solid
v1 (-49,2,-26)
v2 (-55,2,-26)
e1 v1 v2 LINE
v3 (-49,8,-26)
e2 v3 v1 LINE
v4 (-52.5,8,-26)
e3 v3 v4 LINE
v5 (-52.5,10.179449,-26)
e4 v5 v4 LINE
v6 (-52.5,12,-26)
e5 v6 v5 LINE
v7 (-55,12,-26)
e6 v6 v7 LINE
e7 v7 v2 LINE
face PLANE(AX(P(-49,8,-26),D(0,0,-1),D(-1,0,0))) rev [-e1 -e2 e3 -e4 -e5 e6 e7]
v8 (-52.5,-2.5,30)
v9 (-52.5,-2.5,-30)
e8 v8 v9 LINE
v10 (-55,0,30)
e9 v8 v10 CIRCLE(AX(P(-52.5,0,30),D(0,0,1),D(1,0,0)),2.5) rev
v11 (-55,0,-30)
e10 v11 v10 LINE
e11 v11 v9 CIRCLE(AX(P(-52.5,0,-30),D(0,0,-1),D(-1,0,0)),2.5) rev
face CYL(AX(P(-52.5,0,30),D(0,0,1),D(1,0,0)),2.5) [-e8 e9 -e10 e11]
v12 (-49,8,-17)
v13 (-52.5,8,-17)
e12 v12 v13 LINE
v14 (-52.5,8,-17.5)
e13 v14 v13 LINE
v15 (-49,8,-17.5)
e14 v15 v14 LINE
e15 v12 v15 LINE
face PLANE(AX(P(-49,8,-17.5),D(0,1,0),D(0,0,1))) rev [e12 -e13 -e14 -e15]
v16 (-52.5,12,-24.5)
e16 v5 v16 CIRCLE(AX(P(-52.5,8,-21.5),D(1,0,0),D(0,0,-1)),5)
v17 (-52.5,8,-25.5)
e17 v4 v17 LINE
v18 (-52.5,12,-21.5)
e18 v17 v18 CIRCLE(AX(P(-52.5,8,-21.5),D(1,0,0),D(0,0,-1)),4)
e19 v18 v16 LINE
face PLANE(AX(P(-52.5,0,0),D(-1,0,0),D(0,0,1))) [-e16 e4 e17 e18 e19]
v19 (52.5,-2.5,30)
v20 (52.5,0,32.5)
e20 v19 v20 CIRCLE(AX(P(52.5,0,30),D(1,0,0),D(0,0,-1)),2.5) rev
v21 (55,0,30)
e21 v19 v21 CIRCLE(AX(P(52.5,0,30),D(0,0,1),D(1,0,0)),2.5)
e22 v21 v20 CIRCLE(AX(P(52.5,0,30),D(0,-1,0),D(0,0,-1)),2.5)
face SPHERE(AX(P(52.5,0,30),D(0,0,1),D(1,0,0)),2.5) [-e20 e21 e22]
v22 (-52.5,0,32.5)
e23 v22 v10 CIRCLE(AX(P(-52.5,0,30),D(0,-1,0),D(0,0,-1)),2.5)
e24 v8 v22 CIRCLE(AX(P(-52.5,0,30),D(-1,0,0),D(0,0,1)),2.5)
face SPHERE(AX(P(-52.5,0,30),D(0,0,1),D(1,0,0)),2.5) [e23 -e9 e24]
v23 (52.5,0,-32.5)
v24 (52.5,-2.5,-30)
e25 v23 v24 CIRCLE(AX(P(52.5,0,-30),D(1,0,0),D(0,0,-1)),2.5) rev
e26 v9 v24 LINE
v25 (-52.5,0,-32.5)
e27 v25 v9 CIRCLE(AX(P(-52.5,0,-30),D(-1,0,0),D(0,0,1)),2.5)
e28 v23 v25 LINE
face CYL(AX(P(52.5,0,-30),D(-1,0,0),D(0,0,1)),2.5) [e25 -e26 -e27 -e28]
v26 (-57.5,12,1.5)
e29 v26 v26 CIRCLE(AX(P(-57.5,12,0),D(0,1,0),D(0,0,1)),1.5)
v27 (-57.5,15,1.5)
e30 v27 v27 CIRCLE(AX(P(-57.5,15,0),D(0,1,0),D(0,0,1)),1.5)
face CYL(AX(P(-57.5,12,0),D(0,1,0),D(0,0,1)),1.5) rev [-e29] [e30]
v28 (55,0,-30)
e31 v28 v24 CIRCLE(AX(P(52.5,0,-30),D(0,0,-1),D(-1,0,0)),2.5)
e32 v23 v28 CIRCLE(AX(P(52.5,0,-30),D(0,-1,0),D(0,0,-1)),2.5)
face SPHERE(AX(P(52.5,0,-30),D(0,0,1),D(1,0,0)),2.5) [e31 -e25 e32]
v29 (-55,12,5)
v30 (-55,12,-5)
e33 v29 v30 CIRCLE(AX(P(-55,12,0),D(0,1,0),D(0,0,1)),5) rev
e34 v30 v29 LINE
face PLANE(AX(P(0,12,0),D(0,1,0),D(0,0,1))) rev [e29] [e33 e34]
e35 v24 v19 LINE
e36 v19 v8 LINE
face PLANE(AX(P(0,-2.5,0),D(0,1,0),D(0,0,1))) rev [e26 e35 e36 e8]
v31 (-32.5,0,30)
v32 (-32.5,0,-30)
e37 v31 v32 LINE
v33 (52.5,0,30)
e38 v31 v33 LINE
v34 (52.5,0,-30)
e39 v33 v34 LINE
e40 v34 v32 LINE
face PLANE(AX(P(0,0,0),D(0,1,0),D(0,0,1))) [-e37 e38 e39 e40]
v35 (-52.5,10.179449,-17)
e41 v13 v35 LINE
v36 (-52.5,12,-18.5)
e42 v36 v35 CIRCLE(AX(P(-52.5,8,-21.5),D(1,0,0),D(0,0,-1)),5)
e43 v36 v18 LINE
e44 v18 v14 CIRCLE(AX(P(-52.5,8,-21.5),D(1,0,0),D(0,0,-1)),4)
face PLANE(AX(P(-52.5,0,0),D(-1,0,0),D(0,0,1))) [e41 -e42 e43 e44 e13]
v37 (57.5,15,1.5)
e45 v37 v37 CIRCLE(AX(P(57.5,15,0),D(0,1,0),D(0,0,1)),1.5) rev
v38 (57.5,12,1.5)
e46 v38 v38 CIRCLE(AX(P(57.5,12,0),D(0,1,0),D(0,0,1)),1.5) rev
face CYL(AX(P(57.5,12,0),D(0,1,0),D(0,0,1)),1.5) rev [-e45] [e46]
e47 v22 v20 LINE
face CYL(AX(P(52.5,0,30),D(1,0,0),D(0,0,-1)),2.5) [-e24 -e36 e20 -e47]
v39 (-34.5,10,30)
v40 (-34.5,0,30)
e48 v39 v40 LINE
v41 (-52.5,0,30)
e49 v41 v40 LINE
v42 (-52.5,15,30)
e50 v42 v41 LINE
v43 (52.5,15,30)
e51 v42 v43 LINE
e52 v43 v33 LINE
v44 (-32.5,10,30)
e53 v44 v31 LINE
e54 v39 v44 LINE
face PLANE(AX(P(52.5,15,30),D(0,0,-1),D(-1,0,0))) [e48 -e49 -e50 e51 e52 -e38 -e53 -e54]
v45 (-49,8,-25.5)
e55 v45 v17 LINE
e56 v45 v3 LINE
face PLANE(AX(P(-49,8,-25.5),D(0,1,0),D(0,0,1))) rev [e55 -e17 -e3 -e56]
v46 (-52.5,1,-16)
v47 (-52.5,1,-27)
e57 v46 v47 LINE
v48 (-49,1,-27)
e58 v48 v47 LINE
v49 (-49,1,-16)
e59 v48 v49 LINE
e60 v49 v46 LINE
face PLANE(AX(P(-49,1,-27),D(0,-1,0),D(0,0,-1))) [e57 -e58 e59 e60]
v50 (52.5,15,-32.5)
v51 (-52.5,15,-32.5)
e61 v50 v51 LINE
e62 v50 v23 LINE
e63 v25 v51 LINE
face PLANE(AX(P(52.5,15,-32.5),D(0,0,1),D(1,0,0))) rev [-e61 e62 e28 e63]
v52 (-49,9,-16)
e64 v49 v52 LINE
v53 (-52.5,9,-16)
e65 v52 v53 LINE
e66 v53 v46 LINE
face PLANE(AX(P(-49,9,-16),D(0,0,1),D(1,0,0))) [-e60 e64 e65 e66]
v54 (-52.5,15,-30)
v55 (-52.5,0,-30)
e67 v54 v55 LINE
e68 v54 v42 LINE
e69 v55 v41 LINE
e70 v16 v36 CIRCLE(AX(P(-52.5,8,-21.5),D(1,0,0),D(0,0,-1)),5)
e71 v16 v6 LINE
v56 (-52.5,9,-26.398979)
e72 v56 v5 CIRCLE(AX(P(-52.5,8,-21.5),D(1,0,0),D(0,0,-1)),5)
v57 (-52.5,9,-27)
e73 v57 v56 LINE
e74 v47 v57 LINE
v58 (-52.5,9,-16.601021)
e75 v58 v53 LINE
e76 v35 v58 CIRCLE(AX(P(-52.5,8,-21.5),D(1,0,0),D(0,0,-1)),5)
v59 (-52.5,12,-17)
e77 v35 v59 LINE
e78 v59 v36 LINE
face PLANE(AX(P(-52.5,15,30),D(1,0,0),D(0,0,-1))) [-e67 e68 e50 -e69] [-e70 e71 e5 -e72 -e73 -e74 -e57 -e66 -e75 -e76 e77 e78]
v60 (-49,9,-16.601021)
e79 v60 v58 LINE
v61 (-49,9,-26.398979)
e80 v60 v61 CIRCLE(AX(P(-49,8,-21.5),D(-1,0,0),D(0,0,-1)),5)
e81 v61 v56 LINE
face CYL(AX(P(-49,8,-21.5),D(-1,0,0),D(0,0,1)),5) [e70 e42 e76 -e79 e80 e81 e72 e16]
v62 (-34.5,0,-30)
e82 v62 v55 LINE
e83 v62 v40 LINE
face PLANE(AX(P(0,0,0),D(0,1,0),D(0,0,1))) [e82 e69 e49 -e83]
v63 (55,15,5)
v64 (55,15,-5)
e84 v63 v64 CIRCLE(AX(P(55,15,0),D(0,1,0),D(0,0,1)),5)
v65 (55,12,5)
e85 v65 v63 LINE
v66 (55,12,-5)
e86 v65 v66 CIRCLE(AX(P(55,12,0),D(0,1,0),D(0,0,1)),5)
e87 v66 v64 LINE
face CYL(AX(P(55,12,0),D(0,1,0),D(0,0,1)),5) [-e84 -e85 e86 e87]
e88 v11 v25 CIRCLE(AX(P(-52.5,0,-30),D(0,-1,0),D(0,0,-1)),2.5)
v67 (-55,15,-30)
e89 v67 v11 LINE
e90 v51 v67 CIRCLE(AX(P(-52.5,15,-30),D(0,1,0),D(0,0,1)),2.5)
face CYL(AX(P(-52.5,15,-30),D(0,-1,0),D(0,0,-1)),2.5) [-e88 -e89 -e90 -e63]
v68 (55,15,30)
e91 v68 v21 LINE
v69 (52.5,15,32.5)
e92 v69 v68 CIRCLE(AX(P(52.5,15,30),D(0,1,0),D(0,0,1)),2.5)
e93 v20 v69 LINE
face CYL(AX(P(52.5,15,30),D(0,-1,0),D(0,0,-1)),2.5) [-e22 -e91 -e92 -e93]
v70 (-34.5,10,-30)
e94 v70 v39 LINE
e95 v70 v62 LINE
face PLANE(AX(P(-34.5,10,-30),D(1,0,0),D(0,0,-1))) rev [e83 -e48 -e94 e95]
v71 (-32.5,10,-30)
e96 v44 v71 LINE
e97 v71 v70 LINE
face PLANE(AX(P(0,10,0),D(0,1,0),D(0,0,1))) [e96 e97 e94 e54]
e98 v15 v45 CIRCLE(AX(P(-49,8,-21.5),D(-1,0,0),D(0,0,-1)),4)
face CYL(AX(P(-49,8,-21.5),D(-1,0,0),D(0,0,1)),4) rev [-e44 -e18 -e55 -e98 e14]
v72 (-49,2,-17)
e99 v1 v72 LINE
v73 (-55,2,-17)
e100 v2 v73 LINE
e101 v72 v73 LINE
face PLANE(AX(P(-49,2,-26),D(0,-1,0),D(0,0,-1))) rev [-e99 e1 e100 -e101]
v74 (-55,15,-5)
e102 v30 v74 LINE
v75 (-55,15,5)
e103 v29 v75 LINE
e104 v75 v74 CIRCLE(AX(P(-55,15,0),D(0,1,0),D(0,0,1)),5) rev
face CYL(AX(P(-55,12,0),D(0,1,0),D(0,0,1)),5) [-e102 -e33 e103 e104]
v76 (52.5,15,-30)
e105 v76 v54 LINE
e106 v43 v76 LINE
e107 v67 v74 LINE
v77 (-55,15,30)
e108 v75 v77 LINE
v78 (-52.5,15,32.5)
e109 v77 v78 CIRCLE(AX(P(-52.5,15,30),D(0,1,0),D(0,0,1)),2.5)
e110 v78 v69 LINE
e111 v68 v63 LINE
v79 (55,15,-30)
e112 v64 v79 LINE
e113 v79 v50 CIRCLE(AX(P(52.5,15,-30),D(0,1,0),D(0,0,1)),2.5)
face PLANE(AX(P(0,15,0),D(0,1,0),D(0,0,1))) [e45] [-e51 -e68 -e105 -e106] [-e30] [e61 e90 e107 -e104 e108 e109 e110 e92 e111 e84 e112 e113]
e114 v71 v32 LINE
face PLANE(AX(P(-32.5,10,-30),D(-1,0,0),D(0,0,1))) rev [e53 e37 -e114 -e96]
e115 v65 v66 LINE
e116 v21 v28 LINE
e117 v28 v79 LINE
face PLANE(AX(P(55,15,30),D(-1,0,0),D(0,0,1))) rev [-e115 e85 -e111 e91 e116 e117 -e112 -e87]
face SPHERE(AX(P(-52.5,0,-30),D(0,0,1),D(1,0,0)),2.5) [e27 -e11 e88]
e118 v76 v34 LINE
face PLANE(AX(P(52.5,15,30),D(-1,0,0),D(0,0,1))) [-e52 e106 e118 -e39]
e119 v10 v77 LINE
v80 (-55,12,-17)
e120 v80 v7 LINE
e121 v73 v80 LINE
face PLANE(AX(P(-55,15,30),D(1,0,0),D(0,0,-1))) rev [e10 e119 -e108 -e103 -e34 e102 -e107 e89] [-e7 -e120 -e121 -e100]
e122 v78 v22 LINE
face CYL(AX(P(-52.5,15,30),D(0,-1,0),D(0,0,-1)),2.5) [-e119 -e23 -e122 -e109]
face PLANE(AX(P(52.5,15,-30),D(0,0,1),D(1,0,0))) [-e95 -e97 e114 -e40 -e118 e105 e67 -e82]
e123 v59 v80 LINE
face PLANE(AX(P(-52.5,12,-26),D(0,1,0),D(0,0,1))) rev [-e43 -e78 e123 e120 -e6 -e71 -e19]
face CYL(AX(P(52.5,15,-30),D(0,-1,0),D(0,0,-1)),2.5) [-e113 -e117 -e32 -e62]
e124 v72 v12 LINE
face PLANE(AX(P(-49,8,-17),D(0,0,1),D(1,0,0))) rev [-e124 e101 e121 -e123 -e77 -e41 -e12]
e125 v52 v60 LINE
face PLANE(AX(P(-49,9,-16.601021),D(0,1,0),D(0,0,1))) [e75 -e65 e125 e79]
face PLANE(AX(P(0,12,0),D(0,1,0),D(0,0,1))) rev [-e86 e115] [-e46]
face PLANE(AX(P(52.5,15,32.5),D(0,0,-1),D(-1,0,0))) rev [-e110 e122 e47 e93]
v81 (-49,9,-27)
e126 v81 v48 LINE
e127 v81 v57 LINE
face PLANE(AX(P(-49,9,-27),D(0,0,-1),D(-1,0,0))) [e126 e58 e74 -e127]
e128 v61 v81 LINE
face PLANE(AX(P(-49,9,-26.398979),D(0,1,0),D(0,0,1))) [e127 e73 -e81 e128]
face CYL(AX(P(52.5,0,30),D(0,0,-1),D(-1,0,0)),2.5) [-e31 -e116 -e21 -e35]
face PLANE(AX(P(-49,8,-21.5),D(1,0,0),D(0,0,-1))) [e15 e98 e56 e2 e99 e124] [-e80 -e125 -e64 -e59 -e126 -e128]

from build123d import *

# Parameters (mm, degrees)
SKETCH1_W           = 105
SKETCH1_H           = 60
BOSS_EXTRUDE1_DEPTH = 15
SHELL1_T            = 2.5
FILLET1_R           = 2.5
SKETCH3_R           = 1.5
BOSS_EXTRUDE2_DEPTH = 3
SKETCH4_W           = 2
SKETCH4_H           = 60
BOSS_EXTRUDE3_DEPTH = 10
BOSS_EXTRUDE4_DEPTH = 6
SKETCH7_W           = 9
SKETCH7_H           = 10
CUT_EXTRUDE1_DEPTH  = 2.5


with BuildPart() as part:
    # Sketch1 → Boss-Extrude1 (new body)
    with BuildSketch(Plane(origin=(0, 0, 0), x_dir=(1, 0, 0), z_dir=(0, 1, 0))):
        Rectangle(SKETCH1_W, SKETCH1_H)
    extrude(amount=BOSS_EXTRUDE1_DEPTH)

    # Shell1
    shell1_openings = [part.faces().sort_by_distance(p)[0] for p in [
        (0, 15, 0),
    ]]
    offset(amount=SHELL1_T, openings=shell1_openings, kind=Kind.INTERSECTION)

    # Fillet1
    # the kernel refuses this fillet: 2.5 mm, written as the material it takes off along each edge
    with BuildSketch(Plane(origin=(52.5, 0, -30), x_dir=(1, 0, 0), z_dir=(0, 0, -1))) as fillet1_piece_1_section:
        Polygon((0, 0), (FILLET1_R, 0), (FILLET1_R, FILLET1_R), (0, FILLET1_R), align=None)
    fillet1_piece_1 = extrude(amount=FILLET1_R, mode=Mode.PRIVATE)
    fillet1_piece_1 = fillet1_piece_1 - Plane(origin=(52.5, 0, -30), x_dir=(-0.7071067811865475, 0.7071067811865475, 0), z_dir=(0, 0, -1)) * Sphere(FILLET1_R, mode=Mode.PRIVATE)
    add(fillet1_piece_1, mode=Mode.SUBTRACT)
    with BuildSketch(Plane(origin=(-52.5, 0, -30), x_dir=(0, -1, 0), z_dir=(0, 0, -1))) as fillet1_piece_2_section:
        Polygon((0, 0), (FILLET1_R, 0), (FILLET1_R, FILLET1_R), (0, FILLET1_R), align=None)
    fillet1_piece_2 = extrude(amount=FILLET1_R, mode=Mode.PRIVATE)
    fillet1_piece_2 = fillet1_piece_2 - Plane(origin=(-52.5, 0, -30), x_dir=(0.7071067811865475, 0.7071067811865475, 0), z_dir=(0, 0, -1)) * Sphere(FILLET1_R, mode=Mode.PRIVATE)
    add(fillet1_piece_2, mode=Mode.SUBTRACT)
    with BuildSketch(Plane(origin=(52.5, 0, 30), x_dir=(0, -1, 0), z_dir=(1, 0, 0))) as fillet1_piece_3_section:
        Polygon((0, 0), (FILLET1_R, 0), (FILLET1_R, -FILLET1_R), (0, -FILLET1_R), align=None)
    fillet1_piece_3 = extrude(amount=FILLET1_R, mode=Mode.PRIVATE)
    fillet1_piece_3 = fillet1_piece_3 - Plane(origin=(52.5, 0, 30), x_dir=(0, 0.7071067811865475, -0.7071067811865475), z_dir=(1, 0, 0)) * Sphere(FILLET1_R, mode=Mode.PRIVATE)
    add(fillet1_piece_3, mode=Mode.SUBTRACT)
    with BuildSketch(Plane(origin=(-52.5, 0, 30), x_dir=(0, 0, 1), z_dir=(0, -1, 0))) as fillet1_piece_4_section:
        Polygon((0, 0), (FILLET1_R, 0), (FILLET1_R, FILLET1_R), (0, FILLET1_R), align=None)
    fillet1_piece_4 = extrude(amount=FILLET1_R, mode=Mode.PRIVATE)
    fillet1_piece_4 = fillet1_piece_4 - Plane(origin=(-52.5, 0, 30), x_dir=(0.7071067811865475, 0, -0.7071067811865476), z_dir=(0, -1, 0)) * Sphere(FILLET1_R, mode=Mode.PRIVATE)
    add(fillet1_piece_4, mode=Mode.SUBTRACT)
    with BuildSketch(Plane(origin=(52.5, -2.5, -32.5), x_dir=(0, 1, 0), z_dir=(-1, 0, 0)), Plane(origin=(-52.5, -2.5, 32.5), x_dir=(0, 1, 0), z_dir=(1, 0, 0))) as fillet1_piece_5:
        with BuildLine():
            CenterArc((FILLET1_R, -FILLET1_R), FILLET1_R, 90, 90)
            Line((0, -FILLET1_R), (0, 0))
            Line((0, 0), (FILLET1_R, 0))
        make_face()
    extrude(amount=105, mode=Mode.SUBTRACT)
    with BuildSketch(Plane(origin=(55, -2.5, 30), x_dir=(0, 1, 0), z_dir=(0, 0, -1)), Plane(origin=(-55, -2.5, -30), x_dir=(0, 1, 0), z_dir=(0, 0, 1))) as fillet1_piece_6:
        with BuildLine():
            CenterArc((FILLET1_R, -FILLET1_R), FILLET1_R, 90, 90)
            Line((0, -FILLET1_R), (0, 0))
            Line((0, 0), (FILLET1_R, 0))
        make_face()
    extrude(amount=60, mode=Mode.SUBTRACT)
    with BuildSketch(Plane(origin=(-55, 21.25, -32.5), x_dir=(0, 0, 1), z_dir=(0, -1, 0)), Plane(origin=(55, 21.25, -32.5), x_dir=(-1, 0, 0), z_dir=(0, -1, 0)), Plane(origin=(55, 0, 32.5), x_dir=(-1, 0, 0), z_dir=(0, 1, 0)), Plane(origin=(-55, 21.25, 32.5), x_dir=(1, 0, 0), z_dir=(0, -1, 0))) as fillet1_piece_7:
        with BuildLine():
            CenterArc((FILLET1_R, -FILLET1_R), FILLET1_R, 90, 90)
            Line((0, -FILLET1_R), (0, 0))
            Line((0, 0), (FILLET1_R, 0))
        make_face()
    extrude(amount=21.25, mode=Mode.SUBTRACT)

    # Sketch3 → Boss-Extrude2 (add)
    # profile 1 of 2: a face of its own
    with BuildSketch(Plane(origin=(0, 15, 0), x_dir=(1, 0, 0), z_dir=(0, 1, 0))):
        with BuildLine():
            Line((55, 5), (55, -5))
            ThreePointArc((55, -5), (60, 0), (55, 5))
        make_face()
        with Locations(Location((57.5, 0, 0), (0, 0, 270))):
            Circle(SKETCH3_R, mode=Mode.SUBTRACT)
    # profile 2 of 2: a face of its own
    with BuildSketch(Plane(origin=(0, 15, 0), x_dir=(1, 0, 0), z_dir=(0, 1, 0))):
        with BuildLine():
            ThreePointArc((-55, 5), (-60, 0), (-55, -5))
            Line((-55, -5), (-55, 5))
        make_face()
        with Locations(Location((-57.5, 0, 0), (0, 0, 270))):
            Circle(SKETCH3_R, mode=Mode.SUBTRACT)
    extrude(amount=-BOSS_EXTRUDE2_DEPTH)

    # Sketch4 → Boss-Extrude3 (add)
    with BuildSketch(Plane(origin=(0, 0, 0), x_dir=(1, 0, 0), z_dir=(0, 1, 0))):
        with Locations((-33.5, 0)):
            Rectangle(SKETCH4_W, SKETCH4_H)
    extrude(amount=BOSS_EXTRUDE3_DEPTH)

    # Sketch5 → Boss-Extrude4 (add)
    with BuildSketch(Plane.ZY.offset(55)):
        with BuildLine():
            Line((-27, 9), (-27, 1))
            Line((-27, 1), (-16, 1))
            Line((-16, 1), (-16, 9))
            Line((-16, 9), (-16.601020514, 9))
            ThreePointArc((-16.601020514, 9), (-21.5, 13), (-26.398979486, 9))
            Line((-26.398979486, 9), (-27, 9))
        make_face()
        with BuildLine():
            Line((-17.5, 8), (-17, 8))
            Line((-17, 8), (-17, 2))
            Line((-17, 2), (-26, 2))
            Line((-26, 2), (-26, 8))
            Line((-26, 8), (-25.5, 8))
            ThreePointArc((-25.5, 8), (-21.5, 12), (-17.5, 8))
        make_face(mode=Mode.SUBTRACT)
    extrude(amount=-BOSS_EXTRUDE4_DEPTH)

    # Sketch7 → Cut-Extrude1 (cut)
    with BuildSketch(Plane.ZY.offset(55)):
        with Locations((-21.5, 7)):
            Rectangle(SKETCH7_W, SKETCH7_H)
    extrude(amount=-CUT_EXTRUDE1_DEPTH, mode=Mode.SUBTRACT)


solid = part.part
